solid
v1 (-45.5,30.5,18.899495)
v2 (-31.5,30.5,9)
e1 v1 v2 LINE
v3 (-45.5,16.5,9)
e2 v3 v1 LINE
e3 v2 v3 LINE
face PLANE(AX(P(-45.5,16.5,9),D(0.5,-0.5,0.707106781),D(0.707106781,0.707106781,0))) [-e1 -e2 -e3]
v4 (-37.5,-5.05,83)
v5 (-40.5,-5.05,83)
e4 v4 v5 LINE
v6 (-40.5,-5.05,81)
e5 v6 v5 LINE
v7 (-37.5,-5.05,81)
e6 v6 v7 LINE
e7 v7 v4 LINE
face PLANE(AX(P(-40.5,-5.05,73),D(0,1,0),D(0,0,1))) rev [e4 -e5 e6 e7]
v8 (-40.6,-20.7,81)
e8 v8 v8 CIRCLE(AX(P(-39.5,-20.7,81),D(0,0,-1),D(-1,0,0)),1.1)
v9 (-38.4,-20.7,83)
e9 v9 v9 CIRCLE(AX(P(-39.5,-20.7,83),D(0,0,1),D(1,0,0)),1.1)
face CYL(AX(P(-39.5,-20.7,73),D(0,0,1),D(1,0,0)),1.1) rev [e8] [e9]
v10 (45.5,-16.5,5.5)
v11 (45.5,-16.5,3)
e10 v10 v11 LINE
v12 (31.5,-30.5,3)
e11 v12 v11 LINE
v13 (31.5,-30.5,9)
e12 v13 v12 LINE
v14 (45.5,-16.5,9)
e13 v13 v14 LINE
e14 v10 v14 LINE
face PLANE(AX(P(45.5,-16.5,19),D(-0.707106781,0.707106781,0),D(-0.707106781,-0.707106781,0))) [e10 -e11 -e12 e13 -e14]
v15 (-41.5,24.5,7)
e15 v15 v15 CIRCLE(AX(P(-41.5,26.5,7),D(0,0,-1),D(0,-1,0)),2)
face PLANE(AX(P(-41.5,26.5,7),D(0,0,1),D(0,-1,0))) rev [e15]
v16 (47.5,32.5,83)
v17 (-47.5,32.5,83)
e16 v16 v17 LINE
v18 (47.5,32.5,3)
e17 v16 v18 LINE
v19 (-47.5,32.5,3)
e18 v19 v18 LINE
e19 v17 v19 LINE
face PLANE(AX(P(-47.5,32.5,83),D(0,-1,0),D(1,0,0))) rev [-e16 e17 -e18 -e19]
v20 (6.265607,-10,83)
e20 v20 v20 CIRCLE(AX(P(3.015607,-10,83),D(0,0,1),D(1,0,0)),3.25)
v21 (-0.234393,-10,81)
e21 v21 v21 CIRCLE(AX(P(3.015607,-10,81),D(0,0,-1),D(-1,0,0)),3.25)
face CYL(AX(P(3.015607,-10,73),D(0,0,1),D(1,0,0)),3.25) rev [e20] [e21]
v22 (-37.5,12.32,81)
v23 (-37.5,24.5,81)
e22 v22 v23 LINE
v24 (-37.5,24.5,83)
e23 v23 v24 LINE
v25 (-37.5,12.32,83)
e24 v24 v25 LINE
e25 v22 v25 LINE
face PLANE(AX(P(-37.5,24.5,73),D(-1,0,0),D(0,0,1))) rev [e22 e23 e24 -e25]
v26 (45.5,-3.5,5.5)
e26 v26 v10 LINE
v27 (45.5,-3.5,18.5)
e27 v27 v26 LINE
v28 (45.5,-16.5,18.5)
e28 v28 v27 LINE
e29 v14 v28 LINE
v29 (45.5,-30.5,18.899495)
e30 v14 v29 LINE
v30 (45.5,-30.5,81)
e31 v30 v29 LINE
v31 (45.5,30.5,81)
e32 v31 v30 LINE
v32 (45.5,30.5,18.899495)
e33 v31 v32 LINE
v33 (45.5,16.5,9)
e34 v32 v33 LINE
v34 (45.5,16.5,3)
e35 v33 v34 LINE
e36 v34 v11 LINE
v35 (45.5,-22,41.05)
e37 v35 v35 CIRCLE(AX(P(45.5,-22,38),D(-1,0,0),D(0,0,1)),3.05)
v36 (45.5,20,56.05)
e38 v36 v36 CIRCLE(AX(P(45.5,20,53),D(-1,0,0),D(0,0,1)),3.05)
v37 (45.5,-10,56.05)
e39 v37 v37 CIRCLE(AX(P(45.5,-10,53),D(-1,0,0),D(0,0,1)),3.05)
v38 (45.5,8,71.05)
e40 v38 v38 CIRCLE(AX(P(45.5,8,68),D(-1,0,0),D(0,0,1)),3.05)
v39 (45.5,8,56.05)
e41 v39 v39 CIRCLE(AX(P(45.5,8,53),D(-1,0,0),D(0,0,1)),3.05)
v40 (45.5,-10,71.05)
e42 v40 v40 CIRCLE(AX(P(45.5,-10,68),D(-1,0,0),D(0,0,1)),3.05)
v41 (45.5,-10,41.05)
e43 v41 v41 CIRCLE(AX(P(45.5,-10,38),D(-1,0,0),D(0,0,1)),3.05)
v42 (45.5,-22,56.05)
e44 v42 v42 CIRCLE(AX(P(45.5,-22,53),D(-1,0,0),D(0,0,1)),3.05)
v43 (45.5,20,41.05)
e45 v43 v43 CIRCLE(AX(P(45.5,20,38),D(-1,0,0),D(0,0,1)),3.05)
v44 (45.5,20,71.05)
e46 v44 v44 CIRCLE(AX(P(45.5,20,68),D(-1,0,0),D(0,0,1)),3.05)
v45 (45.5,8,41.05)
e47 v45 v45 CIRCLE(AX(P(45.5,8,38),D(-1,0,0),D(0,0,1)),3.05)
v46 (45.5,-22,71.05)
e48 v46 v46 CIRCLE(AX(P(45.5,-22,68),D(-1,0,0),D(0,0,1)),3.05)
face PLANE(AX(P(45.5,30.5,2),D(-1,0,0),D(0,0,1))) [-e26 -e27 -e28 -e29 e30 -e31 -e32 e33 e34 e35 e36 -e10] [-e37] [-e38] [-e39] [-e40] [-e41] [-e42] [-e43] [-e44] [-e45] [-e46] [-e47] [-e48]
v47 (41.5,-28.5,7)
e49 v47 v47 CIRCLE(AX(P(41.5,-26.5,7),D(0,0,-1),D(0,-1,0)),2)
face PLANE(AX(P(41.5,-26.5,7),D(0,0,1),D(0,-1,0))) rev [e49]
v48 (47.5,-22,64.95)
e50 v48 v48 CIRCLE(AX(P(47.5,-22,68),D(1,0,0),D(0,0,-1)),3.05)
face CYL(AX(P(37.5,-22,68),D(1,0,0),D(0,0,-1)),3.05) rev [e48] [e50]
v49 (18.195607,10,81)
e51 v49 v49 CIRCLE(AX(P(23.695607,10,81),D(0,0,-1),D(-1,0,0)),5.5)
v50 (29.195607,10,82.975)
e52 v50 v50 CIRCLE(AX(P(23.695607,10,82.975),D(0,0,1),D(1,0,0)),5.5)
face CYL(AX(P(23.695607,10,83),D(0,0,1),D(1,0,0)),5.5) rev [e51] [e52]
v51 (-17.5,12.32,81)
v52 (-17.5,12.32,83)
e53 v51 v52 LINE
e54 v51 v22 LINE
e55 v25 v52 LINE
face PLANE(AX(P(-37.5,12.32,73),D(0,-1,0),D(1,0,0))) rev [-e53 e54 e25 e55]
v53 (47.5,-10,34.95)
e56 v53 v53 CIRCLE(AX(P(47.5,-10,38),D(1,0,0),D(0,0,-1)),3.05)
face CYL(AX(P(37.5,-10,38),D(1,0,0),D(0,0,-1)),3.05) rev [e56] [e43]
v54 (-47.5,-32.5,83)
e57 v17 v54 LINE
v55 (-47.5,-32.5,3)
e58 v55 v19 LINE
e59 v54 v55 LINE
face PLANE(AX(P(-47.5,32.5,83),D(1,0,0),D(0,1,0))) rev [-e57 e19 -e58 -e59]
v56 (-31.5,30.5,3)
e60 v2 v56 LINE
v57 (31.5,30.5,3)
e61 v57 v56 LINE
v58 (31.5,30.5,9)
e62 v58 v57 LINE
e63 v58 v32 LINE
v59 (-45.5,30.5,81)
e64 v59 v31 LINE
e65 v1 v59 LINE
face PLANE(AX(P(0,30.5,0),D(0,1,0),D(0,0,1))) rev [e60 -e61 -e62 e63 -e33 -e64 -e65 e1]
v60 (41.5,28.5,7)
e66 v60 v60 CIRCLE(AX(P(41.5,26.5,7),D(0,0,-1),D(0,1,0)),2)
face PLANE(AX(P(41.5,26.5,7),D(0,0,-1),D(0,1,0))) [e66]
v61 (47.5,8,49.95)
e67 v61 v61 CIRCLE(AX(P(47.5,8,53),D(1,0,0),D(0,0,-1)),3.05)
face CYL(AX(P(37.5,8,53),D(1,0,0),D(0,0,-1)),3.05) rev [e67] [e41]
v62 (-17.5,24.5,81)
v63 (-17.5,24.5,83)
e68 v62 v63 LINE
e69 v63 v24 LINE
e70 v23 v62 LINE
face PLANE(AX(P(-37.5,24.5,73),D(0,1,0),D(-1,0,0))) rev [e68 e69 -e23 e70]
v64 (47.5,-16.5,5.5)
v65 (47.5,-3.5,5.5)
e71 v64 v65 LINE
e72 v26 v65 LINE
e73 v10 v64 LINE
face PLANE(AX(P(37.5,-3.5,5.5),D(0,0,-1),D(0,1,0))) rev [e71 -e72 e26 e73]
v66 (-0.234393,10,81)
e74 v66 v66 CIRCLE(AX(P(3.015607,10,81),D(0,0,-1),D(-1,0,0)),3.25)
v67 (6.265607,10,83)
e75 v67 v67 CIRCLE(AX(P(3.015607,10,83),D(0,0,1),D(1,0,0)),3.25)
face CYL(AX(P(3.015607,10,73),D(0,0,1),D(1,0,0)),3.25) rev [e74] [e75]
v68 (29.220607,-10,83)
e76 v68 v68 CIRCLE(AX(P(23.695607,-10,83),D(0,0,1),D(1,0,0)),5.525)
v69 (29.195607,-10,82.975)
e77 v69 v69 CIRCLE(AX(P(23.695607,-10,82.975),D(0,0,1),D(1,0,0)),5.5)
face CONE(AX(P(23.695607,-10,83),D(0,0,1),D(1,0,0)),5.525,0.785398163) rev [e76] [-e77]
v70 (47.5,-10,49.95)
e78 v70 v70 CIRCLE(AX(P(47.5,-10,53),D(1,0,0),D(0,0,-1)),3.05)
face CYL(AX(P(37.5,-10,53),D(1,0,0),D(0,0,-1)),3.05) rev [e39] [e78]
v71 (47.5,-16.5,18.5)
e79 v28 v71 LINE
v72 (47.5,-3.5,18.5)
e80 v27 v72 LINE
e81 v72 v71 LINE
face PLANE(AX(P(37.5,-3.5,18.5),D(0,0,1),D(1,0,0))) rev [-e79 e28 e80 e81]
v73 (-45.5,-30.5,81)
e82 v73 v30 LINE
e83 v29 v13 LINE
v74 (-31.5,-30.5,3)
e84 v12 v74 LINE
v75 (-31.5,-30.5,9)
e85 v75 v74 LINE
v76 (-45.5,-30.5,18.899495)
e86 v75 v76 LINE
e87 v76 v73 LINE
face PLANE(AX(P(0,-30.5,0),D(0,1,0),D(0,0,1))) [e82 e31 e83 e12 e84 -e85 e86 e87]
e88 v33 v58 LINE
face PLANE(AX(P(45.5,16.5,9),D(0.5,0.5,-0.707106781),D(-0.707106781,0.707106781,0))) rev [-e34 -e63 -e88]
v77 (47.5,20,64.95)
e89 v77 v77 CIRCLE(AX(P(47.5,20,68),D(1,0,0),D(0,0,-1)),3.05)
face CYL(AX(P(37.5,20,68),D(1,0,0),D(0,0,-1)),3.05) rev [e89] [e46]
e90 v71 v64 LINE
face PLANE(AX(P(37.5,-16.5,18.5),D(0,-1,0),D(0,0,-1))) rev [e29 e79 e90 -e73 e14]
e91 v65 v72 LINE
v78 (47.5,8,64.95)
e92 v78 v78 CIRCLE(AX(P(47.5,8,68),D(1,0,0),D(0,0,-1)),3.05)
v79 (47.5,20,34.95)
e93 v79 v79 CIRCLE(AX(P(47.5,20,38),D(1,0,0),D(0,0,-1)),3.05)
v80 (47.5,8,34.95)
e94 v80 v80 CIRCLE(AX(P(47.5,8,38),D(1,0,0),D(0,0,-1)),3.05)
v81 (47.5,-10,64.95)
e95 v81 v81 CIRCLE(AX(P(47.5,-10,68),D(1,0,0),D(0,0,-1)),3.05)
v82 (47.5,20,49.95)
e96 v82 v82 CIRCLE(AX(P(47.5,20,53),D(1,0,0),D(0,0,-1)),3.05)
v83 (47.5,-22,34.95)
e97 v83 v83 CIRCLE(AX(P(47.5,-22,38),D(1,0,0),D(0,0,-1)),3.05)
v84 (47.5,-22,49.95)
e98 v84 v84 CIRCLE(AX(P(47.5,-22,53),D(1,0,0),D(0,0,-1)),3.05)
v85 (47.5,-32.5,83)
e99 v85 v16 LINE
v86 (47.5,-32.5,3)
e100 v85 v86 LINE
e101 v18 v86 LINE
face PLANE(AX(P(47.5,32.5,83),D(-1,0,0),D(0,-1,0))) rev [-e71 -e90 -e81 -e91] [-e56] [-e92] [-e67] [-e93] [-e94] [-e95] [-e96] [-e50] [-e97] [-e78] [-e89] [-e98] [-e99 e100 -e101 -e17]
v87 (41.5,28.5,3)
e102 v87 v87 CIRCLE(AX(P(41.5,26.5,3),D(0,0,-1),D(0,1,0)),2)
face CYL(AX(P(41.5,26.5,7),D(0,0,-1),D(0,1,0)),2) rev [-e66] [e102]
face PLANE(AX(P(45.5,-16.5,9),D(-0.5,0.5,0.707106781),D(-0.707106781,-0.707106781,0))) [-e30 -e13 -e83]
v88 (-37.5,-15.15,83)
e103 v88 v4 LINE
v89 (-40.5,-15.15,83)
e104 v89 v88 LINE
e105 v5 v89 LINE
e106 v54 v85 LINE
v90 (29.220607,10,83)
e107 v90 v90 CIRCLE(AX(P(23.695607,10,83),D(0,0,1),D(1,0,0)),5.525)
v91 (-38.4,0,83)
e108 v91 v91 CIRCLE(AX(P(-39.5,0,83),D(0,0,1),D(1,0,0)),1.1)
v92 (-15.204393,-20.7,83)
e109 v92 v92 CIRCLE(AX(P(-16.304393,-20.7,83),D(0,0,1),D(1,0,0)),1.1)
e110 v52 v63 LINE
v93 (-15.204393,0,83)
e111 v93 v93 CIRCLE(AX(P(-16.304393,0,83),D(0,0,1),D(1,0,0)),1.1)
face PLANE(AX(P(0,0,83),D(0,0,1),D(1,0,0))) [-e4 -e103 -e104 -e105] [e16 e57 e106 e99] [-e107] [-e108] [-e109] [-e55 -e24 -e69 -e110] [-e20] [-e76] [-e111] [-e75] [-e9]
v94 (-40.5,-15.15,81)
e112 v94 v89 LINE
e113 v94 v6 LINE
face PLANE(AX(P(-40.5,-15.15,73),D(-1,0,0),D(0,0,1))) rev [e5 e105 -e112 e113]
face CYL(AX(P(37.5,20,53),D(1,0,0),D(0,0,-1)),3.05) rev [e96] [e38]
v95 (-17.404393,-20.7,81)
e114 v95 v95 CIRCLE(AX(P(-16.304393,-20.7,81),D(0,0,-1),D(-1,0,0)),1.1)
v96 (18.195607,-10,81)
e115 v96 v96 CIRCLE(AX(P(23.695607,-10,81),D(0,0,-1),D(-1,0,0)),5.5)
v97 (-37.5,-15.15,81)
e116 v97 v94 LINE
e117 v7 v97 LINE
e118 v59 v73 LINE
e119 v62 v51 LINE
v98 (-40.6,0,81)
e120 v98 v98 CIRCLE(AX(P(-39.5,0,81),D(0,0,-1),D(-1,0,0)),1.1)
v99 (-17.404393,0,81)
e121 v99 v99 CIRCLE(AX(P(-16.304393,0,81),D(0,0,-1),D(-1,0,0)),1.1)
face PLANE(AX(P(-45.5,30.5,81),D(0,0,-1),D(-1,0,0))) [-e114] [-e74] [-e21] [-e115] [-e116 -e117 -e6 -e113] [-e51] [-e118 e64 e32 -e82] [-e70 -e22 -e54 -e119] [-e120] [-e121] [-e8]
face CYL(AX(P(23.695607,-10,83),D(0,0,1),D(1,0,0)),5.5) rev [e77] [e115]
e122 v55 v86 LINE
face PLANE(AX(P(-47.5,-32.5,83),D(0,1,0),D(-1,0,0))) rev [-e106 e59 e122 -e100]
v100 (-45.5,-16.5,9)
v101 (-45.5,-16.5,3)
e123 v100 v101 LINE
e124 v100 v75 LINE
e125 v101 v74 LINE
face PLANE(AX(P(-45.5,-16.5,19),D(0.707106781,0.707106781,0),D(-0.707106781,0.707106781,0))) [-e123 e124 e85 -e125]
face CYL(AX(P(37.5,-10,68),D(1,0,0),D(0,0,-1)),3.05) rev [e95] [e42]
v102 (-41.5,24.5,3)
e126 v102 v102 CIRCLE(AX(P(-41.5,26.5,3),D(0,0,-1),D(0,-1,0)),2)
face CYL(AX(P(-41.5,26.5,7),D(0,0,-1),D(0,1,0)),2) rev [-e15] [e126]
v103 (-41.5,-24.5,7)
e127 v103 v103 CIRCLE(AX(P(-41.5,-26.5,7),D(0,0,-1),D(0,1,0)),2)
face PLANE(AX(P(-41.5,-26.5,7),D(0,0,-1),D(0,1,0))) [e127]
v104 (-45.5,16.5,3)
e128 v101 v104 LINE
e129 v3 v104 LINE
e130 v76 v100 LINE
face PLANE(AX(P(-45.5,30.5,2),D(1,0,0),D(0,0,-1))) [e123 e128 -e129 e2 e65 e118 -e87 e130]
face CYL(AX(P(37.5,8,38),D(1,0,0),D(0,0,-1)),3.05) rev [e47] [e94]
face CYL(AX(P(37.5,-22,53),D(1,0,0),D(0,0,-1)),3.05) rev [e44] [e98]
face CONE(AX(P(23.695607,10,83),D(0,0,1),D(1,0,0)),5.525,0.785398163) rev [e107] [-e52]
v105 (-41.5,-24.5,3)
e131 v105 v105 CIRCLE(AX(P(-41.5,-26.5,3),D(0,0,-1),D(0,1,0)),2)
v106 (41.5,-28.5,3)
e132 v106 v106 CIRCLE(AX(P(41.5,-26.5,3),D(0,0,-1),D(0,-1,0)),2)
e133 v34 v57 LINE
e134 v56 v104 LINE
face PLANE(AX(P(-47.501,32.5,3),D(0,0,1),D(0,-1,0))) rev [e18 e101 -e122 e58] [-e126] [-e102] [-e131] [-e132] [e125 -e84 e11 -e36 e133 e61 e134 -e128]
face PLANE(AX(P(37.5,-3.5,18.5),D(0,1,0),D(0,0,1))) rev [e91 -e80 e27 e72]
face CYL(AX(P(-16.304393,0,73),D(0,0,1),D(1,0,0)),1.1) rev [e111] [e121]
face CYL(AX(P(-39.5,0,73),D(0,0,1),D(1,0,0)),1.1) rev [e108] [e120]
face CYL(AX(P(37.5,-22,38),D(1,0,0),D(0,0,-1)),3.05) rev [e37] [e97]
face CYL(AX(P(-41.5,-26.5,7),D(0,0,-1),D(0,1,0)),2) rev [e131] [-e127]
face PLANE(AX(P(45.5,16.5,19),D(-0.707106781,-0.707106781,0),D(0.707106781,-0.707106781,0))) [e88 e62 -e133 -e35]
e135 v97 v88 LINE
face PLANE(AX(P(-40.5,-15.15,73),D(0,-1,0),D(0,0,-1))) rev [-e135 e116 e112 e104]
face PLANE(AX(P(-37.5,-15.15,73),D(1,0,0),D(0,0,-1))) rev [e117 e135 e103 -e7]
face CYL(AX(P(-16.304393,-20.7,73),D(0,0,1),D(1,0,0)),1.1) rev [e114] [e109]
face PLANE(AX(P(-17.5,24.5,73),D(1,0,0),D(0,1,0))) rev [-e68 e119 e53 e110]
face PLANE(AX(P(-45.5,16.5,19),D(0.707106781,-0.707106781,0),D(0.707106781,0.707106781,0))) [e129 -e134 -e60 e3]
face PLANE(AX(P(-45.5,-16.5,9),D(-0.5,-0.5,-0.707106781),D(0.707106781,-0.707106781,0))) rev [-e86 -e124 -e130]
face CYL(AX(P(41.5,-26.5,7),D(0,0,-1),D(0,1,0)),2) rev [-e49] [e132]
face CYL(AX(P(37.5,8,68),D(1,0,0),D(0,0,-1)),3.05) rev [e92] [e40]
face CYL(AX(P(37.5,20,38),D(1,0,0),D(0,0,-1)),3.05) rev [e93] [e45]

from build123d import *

# Parameters (mm, degrees)
ESQUISSE1_W                  = 95
ESQUISSE1_H                  = 65
BOSS_EXTRU_1_DEPTH           = 83
ENL_V_MAT_EXTRU_3_DEPTH      = 30.5
ENL_V_MAT_EXTRU_3_DEPTH_BACK = 30.5
ESQUISSE4_W                  = 91
ESQUISSE4_H                  = 79
ESQUISSE2_R                  = 1.1
ESQUISSE2_R_2                = 3.25
ESQUISSE2_W                  = 20
ESQUISSE2_H                  = 12.18
ESQUISSE2_W_2                = 3
ESQUISSE2_H_2                = 10.1
ENL_V_MAT_EXTRU_1_DEPTH      = 10
ESQUISSE5_R                  = 3.05
ENL_V_MAT_EXTRU_4_DEPTH      = 10
ESQUISSE6_W                  = 13
ESQUISSE6_H                  = 13
ENL_V_MAT_EXTRU_6_DEPTH      = 10
R_P_TITION_LIN_AIRE1_COUNT   = 2
R_P_TITION_LIN_AIRE1_PITCH   = 20
ENL_V_MAT_EXTRU_7_REACH      = 132.27
ESQUISSE9_W                  = 3
ESQUISSE9_H                  = 65
BOSS_EXTRU_2_DEPTH           = 16
ESQUISSE11_R                 = 2
ENL_V_MAT_EXTRU_8_DEPTH      = 4
CHANFREIN5_SIZE              = 10
CHANFREIN6_SIZE              = 10
CHANFREIN7_SIZE              = 10
CHANFREIN8_SIZE              = 10


with BuildPart() as part:
    # Esquisse1 → Boss.-Extru.1 (new body)
    with BuildSketch(Plane.XY):
        Rectangle(ESQUISSE1_W, ESQUISSE1_H)
    extrude(amount=BOSS_EXTRU_1_DEPTH)

    # Esquisse4 → Enlèv. mat.-Extru.3 (cut, two sides: drawn at the far end of the back side and taken through both)
    with BuildSketch(Plane(origin=(0, 0, 0), x_dir=(1, 0, 0), z_dir=(0, 1, 0)).offset(-ENL_V_MAT_EXTRU_3_DEPTH_BACK)):
        with Locations((0, -41.5)):
            Rectangle(ESQUISSE4_W, ESQUISSE4_H)
    extrude(amount=ENL_V_MAT_EXTRU_3_DEPTH + ENL_V_MAT_EXTRU_3_DEPTH_BACK, mode=Mode.SUBTRACT)

    # Esquisse2 → Enlèv. mat.-Extru.1 (cut)
    with BuildSketch(Plane.XY.offset(83)):
        with Locations((-39.5, 0)):
            Circle(ESQUISSE2_R)
        with Locations((-39.5, -20.7)):
            Circle(ESQUISSE2_R)
        with Locations((-16.30439307, 0)):
            Circle(ESQUISSE2_R)
        with Locations((-16.30439307, -20.7)):
            Circle(ESQUISSE2_R)
        with Locations((3.01560693, 10)):
            Circle(ESQUISSE2_R_2)
        with Locations((3.01560693, -10)):
            Circle(ESQUISSE2_R_2)
        with Locations((-27.5, 18.41)):
            Rectangle(ESQUISSE2_W, ESQUISSE2_H)
        with Locations((-39, -10.1)):
            Rectangle(ESQUISSE2_W_2, ESQUISSE2_H_2)
    extrude(amount=-ENL_V_MAT_EXTRU_1_DEPTH, mode=Mode.SUBTRACT)

    # Esquisse5 → Enlèv. mat.-Extru.4 (cut)
    with BuildSketch(Plane(origin=(47.5, 0, 0), x_dir=(0, 0, -1), z_dir=(1, 0, 0))):
        with Locations((-68, -22)):
            Circle(ESQUISSE5_R)
        with Locations((-68, -10)):
            Circle(ESQUISSE5_R)
        with Locations((-53, -22)):
            Circle(ESQUISSE5_R)
        with Locations((-53, -10)):
            Circle(ESQUISSE5_R)
        with Locations((-38, -22)):
            Circle(ESQUISSE5_R)
        with Locations((-38, -10)):
            Circle(ESQUISSE5_R)
        with Locations((-68, 8)):
            Circle(ESQUISSE5_R)
        with Locations((-68, 20)):
            Circle(ESQUISSE5_R)
        with Locations((-53, 20)):
            Circle(ESQUISSE5_R)
        with Locations((-53, 8)):
            Circle(ESQUISSE5_R)
        with Locations((-38, 20)):
            Circle(ESQUISSE5_R)
        with Locations((-38, 8)):
            Circle(ESQUISSE5_R)
    extrude(amount=-ENL_V_MAT_EXTRU_4_DEPTH, mode=Mode.SUBTRACT)

    # Esquisse6 → Enlèv. mat.-Extru.6 (cut)
    with BuildSketch(Plane(origin=(47.5, 0, 0), x_dir=(0, 0, -1), z_dir=(1, 0, 0))):
        with Locations((-12, -10)):
            Rectangle(ESQUISSE6_W, ESQUISSE6_H)
    extrude(amount=-ENL_V_MAT_EXTRU_6_DEPTH, mode=Mode.SUBTRACT)

    # Esquisse8 → Dégagement M101 (revolve, cut)
    with BuildSketch(Plane(origin=(23.69560693, 10, 83), x_dir=(0, -1, 0), z_dir=(1, 0, 0))):
        Polygon((0, 0), (0, 21.474733405), (5.5, 18.17), (5.5, 0.025), (5.525, 0), align=None)
    d_gagement_m101 = revolve(axis=Axis((23.69560693, 10, 89.35), (0, 0, -1)), mode=Mode.SUBTRACT)

    # Répétition linéaire1: Dégagement M101 ×2
    with Locations(*[(0, -i * R_P_TITION_LIN_AIRE1_PITCH, 0) for i in range(1, R_P_TITION_LIN_AIRE1_COUNT)]):
        add(d_gagement_m101, mode=Mode.SUBTRACT)

    # Esquisse9 → Enlèv. mat.-Extru.7 (cut, up to next)
    with BuildSketch(Plane(origin=(47.5, 0, 0), x_dir=(0, 0, -1), z_dir=(1, 0, 0)), mode=Mode.PRIVATE) as enl_v_mat_extru_7_sk1:
        with Locations((-1.5, 0)):
            Rectangle(ESQUISSE9_W, ESQUISSE9_H)
    enl_v_mat_extru_7_tool1 = extrude(enl_v_mat_extru_7_sk1.sketch, amount=-ENL_V_MAT_EXTRU_7_REACH, mode=Mode.PRIVATE) & part.part
    add(enl_v_mat_extru_7_tool1.solids().sort_by_distance((47.5, 0, 1.5))[0], mode=Mode.SUBTRACT)

    # Esquisse10 → Boss.-Extru.2 (add)
    with BuildSketch(Plane(origin=(0, 0, 3), x_dir=(-1, 0, 0), z_dir=(0, 0, -1))):
        Polygon((-45.5, 16.5), (-31.5, 30.5), (-45.5, 30.5), align=None)
        Polygon((45.5, 16.5), (31.5, 30.5), (45.5, 30.5), align=None)
        Polygon((45.5, -16.5), (31.5, -30.5), (45.5, -30.5), align=None)
        Polygon((-45.5, -16.5), (-31.5, -30.5), (-45.5, -30.5), align=None)
    extrude(amount=-BOSS_EXTRU_2_DEPTH)

    # Esquisse11 → Enlèv. mat.-Extru.8 (cut)
    with BuildSketch(Plane(origin=(0, 0, 3), x_dir=(-1, 0, 0), z_dir=(0, 0, -1))):
        with Locations(Location((-41.5, 26.5, 0), (0, 0, 90))):
            Circle(ESQUISSE11_R)
        with Locations(Location((41.5, 26.5, 0), (0, 0, 270))):
            Circle(ESQUISSE11_R)
        with Locations(Location((-41.5, -26.5, 0), (0, 0, 270))):
            Circle(ESQUISSE11_R)
        with Locations(Location((41.5, -26.5, 0), (0, 0, 90))):
            Circle(ESQUISSE11_R)
    extrude(amount=-ENL_V_MAT_EXTRU_8_DEPTH, mode=Mode.SUBTRACT)

    # Chanfrein5
    # the kernel refuses this chamfer: 10 mm, written as the material it takes off along each edge
    with BuildSketch(Plane(origin=(63.684544799, -1.684544799, 19), x_dir=(-0.019442520806014222, -0.019442520806014142, -0.9996219169112968), z_dir=(-0.7071067811865474, 0.7071067811865478, 0))) as chanfrein5_piece_1_section:
        Polygon((CHANFREIN5_SIZE * 0.999621916911, -CHANFREIN5_SIZE * 0.0274958766106), (-CHANFREIN5_SIZE * 0.0274958766106, -CHANFREIN5_SIZE * 0.999621916911), (0, 0), align=None)
    chanfrein5_piece_1 = extrude(amount=71.232649633, mode=Mode.PRIVATE)
    chanfrein5_piece_1 = split(chanfrein5_piece_1, bisect_by=Plane(origin=(45.5, 25.258750221, 15.243624208), z_dir=(-1, 0, 0)), keep=Keep.TOP, mode=Mode.PRIVATE)
    chanfrein5_piece_1 = split(chanfrein5_piece_1, bisect_by=Plane(origin=(40.258750221, 30.5, 15.243624208), z_dir=(0, -1, 0)), keep=Keep.TOP, mode=Mode.PRIVATE)
    add(chanfrein5_piece_1, mode=Mode.SUBTRACT)

    # Chanfrein6
    # the kernel refuses this chamfer: 10 mm, written as the material it takes off along each edge
    with BuildSketch(Plane(origin=(-63.684544799, 1.684544799, 19), x_dir=(0.019442520806014323, 0.01944252080601439, -0.9996219169112968), z_dir=(0.7071067811865476, -0.7071067811865476, 0))) as chanfrein6_piece_1_section:
        Polygon((CHANFREIN6_SIZE * 0.999621916911, -CHANFREIN6_SIZE * 0.0274958766106), (-CHANFREIN6_SIZE * 0.0274958766106, -CHANFREIN6_SIZE * 0.999621916911), (0, 0), align=None)
    chanfrein6_piece_1 = extrude(amount=71.232649633, mode=Mode.PRIVATE)
    chanfrein6_piece_1 = split(chanfrein6_piece_1, bisect_by=Plane(origin=(-45.5, -25.258750221, 15.243624208), z_dir=(1, 0, 0)), keep=Keep.TOP, mode=Mode.PRIVATE)
    chanfrein6_piece_1 = split(chanfrein6_piece_1, bisect_by=Plane(origin=(-40.258750221, -30.5, 15.243624208), z_dir=(0, 1, 0)), keep=Keep.TOP, mode=Mode.PRIVATE)
    add(chanfrein6_piece_1, mode=Mode.SUBTRACT)

    # Chanfrein7
    # the kernel refuses this chamfer: 10 mm, written as the material it takes off along each edge
    with BuildSketch(Plane(origin=(63.684544799, 1.684544799, 19), x_dir=(0.7068394360706736, -0.7068394360706736, 0.02749587661058597), z_dir=(-0.7071067811865476, -0.7071067811865476, 0))) as chanfrein7_piece_1_section:
        Polygon((CHANFREIN7_SIZE * 0.999621916911, -CHANFREIN7_SIZE * 0.0274958766106), (-CHANFREIN7_SIZE * 0.0274958766106, -CHANFREIN7_SIZE * 0.999621916911), (0, 0), align=None)
    chanfrein7_piece_1 = extrude(amount=71.232649633, mode=Mode.PRIVATE)
    chanfrein7_piece_1 = split(chanfrein7_piece_1, bisect_by=Plane(origin=(40.831369683, -30.5, 18.750065142), z_dir=(0, 1, 0)), keep=Keep.TOP, mode=Mode.PRIVATE)
    chanfrein7_piece_1 = split(chanfrein7_piece_1, bisect_by=Plane(origin=(45.5, -25.831369683, 18.750065142), z_dir=(-1, 0, 0)), keep=Keep.TOP, mode=Mode.PRIVATE)
    add(chanfrein7_piece_1, mode=Mode.SUBTRACT)

    # Chanfrein8
    # the kernel refuses this chamfer: 10 mm, written as the material it takes off along each edge
    with BuildSketch(Plane(origin=(-63.684544799, -1.684544799, 19), x_dir=(0.019442520806014378, -0.019442520806014312, -0.9996219169112968), z_dir=(0.7071067811865476, 0.7071067811865476, 0))) as chanfrein8_piece_1_section:
        Polygon((CHANFREIN8_SIZE * 0.999621916911, CHANFREIN8_SIZE * 0.0274958766106), (-CHANFREIN8_SIZE * 0.0274958766106, CHANFREIN8_SIZE * 0.999621916911), (0, 0), align=None)
    chanfrein8_piece_1 = extrude(amount=71.232649633, mode=Mode.PRIVATE)
    chanfrein8_piece_1 = split(chanfrein8_piece_1, bisect_by=Plane(origin=(-45.5, 25.258750221, 15.243624208), z_dir=(1, 0, 0)), keep=Keep.TOP, mode=Mode.PRIVATE)
    chanfrein8_piece_1 = split(chanfrein8_piece_1, bisect_by=Plane(origin=(-40.258750221, 30.5, 15.243624208), z_dir=(0, -1, 0)), keep=Keep.TOP, mode=Mode.PRIVATE)
    add(chanfrein8_piece_1, mode=Mode.SUBTRACT)


solid = part.part
